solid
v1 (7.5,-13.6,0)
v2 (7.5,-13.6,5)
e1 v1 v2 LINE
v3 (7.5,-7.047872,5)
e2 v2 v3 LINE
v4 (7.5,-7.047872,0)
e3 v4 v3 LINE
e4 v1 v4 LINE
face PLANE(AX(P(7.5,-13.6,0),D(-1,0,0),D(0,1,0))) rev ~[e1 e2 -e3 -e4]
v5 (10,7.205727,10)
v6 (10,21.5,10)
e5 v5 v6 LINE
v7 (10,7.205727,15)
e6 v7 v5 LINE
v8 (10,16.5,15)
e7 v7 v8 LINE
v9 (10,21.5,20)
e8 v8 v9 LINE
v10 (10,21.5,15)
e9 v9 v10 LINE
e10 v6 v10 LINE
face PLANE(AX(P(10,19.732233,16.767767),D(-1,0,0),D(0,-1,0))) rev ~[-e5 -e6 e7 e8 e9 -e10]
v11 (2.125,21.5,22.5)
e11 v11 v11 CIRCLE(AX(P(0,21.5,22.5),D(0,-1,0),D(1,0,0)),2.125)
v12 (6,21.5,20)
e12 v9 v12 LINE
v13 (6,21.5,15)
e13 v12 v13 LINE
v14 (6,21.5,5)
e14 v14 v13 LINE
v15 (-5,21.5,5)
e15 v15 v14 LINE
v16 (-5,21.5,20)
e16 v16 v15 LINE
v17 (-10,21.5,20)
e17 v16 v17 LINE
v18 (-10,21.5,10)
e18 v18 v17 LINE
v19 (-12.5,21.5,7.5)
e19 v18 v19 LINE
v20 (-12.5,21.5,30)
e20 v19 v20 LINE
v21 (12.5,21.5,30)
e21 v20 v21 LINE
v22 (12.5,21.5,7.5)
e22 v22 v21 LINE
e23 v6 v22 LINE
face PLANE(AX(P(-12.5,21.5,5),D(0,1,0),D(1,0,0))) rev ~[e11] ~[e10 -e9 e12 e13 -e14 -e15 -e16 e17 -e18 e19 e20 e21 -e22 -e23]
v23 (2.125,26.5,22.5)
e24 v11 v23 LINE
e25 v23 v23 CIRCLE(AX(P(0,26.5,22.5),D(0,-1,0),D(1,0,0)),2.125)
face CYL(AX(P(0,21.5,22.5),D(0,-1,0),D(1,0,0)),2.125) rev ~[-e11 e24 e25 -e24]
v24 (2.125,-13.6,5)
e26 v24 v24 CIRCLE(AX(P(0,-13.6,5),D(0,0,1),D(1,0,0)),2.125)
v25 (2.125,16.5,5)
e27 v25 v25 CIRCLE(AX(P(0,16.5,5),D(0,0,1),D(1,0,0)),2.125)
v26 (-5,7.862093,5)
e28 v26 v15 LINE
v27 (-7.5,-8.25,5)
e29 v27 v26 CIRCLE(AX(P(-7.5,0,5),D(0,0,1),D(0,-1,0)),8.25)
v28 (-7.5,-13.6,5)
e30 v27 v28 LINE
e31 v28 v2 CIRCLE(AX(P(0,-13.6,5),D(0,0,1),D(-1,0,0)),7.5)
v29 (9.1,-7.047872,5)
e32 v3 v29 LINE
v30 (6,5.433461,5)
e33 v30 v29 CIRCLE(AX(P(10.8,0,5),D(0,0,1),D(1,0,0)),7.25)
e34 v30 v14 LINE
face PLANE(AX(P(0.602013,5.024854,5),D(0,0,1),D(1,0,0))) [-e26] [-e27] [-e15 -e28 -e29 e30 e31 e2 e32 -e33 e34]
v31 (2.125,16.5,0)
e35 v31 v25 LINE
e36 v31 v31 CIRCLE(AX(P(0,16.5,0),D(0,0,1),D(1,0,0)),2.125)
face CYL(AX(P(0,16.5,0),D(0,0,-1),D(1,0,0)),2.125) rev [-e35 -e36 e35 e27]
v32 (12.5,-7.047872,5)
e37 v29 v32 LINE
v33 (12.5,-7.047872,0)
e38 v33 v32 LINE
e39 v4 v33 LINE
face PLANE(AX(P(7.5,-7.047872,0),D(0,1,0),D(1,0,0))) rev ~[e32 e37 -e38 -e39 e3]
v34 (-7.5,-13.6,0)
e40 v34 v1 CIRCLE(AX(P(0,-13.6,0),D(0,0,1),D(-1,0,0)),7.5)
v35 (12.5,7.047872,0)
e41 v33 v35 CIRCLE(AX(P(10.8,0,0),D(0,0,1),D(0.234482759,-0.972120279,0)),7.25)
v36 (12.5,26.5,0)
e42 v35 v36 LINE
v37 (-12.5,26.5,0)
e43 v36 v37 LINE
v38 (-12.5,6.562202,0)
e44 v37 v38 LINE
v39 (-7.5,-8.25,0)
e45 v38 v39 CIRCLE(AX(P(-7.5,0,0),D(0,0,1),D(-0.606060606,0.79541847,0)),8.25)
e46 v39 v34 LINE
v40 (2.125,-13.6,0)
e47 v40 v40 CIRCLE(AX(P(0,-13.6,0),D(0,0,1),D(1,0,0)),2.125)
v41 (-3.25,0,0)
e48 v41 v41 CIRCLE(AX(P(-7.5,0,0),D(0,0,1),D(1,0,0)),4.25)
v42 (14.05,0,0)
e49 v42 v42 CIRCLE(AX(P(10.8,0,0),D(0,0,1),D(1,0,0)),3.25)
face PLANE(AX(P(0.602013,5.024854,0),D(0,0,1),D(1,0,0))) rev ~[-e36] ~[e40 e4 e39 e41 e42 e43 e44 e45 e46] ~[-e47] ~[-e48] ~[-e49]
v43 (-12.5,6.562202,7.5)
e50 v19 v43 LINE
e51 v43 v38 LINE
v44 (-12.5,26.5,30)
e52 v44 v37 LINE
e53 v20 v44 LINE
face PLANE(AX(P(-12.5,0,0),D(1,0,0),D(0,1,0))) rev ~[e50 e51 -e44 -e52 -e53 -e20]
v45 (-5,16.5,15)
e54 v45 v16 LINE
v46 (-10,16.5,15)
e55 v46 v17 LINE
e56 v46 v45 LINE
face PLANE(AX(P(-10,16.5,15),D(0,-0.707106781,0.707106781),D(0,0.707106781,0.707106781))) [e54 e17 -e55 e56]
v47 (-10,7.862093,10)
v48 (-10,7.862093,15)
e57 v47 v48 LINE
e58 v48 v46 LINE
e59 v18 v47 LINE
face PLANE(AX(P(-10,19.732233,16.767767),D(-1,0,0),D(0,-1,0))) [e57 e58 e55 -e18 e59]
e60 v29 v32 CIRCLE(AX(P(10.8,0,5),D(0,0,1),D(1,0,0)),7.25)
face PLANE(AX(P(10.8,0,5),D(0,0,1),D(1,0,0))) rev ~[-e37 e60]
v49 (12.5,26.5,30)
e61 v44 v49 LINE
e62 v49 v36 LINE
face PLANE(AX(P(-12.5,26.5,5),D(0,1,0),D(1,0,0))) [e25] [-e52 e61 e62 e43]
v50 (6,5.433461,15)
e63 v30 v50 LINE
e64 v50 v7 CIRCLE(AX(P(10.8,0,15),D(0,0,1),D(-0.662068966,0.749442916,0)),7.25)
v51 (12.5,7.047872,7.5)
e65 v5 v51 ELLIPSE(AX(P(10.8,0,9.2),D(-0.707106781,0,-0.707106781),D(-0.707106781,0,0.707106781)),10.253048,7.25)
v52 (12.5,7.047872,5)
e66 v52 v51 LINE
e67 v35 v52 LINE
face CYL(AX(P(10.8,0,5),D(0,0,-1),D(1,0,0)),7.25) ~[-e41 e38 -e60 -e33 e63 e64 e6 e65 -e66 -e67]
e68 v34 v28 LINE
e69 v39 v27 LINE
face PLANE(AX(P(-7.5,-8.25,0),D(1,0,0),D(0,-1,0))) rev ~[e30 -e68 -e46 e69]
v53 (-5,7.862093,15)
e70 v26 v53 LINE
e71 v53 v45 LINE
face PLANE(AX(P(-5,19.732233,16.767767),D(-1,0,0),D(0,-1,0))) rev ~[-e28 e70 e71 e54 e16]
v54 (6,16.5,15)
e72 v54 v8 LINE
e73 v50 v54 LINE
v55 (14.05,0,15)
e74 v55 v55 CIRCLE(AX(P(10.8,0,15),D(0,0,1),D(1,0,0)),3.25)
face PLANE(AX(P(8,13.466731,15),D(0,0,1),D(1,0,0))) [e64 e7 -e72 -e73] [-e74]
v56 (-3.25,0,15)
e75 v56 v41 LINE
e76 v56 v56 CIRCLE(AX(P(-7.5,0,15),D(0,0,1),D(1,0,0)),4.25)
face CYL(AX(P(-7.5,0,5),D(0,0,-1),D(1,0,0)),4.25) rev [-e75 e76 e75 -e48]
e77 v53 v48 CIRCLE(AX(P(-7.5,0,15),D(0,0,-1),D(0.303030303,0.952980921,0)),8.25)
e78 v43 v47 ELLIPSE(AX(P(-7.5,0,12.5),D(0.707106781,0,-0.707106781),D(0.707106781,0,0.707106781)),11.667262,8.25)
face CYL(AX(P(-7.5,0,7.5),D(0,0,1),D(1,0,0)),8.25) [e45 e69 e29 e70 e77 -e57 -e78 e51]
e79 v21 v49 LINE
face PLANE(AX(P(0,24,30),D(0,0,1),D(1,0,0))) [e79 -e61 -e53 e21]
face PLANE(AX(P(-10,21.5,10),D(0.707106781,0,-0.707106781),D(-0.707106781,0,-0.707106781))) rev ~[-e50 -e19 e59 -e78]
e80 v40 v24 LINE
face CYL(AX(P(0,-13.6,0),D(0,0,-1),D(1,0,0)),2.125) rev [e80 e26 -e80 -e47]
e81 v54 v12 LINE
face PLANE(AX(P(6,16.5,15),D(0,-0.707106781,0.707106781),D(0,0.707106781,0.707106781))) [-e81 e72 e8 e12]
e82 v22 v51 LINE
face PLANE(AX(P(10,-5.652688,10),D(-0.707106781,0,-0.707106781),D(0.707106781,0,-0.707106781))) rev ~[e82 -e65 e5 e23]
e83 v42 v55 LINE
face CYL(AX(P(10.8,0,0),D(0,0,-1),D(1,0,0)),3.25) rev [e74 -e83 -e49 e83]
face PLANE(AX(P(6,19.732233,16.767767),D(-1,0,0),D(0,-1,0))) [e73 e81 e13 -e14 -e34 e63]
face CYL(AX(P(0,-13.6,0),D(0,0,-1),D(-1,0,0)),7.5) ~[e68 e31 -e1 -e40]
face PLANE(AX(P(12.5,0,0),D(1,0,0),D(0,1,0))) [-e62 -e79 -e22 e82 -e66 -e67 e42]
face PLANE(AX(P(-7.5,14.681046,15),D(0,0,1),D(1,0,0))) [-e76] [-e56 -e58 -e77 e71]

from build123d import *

# Parameters (mm, degrees)
F0_R          = 2.125
F0_R_2        = 4.25
F0_R_3        = 3.25
F1_DEPTH      = 5
F2_W          = 25
F2_H          = 5
F3_DEPTH      = 25
F4_R          = 8.25
F4_R_2        = 4.25
F4_R_3        = 7.25
F4_R_4        = 3.25
F5_DEPTH      = 10
F6_R          = 2.125
F7_DEPTH      = 5.001
F8_W          = 5
F8_H          = 13.6379074032
F8_W_2        = 4
F8_H_2        = 16.0665388563
F9_DEPTH      = 10
F10_T1_DEPTH  = 5
F10_T3_DEPTH  = 4
F10_T8_DEPTH  = 17.8584149398
F10_T13_DEPTH = 16.8584149398
F10_T18_DEPTH = 26.4963223431
F10_S19_R     = 8.25
F10_T20_DEPTH = 15
F10_T25_DEPTH = 26.4963223431
F10_S26_R     = 8.25
F10_T27_DEPTH = 15
F10_T32_DEPTH = 27.1526880508
F10_S34_R     = 7.25
F10_T35_DEPTH = 16


# Not quite as in the source:
# - a fillet or chamfer that OpenCascade refuses, or shapes differently, is made with other operations: its cross-section is extruded or revolved along the edge and cut away or added


with BuildPart() as f1:
    # F0 (on Top) → F1 (new body)
    with BuildSketch(Plane.XY):
        with BuildLine():
            Line((12.5, 26.5), (0, 26.5))
            Line((0, 26.5), (-12.5, 26.5))
            Line((-12.5, 26.5), (-12.5, 6.5622023742))
            ThreePointArc((-12.5, 6.5622023742), (-15.3166703137, -2.6385915194), (-7.5, -8.25))
            Line((-7.5, -8.25), (-7.5, -13.6))
            ThreePointArc((-7.5, -13.6), (-5.3033008589, -18.9033008589), (0, -21.1))
            ThreePointArc((0, -21.1), (5.3033008589, -18.9033008589), (7.5, -13.6))
            Line((7.5, -13.6), (7.5, -7.0478720193))
            Line((7.5, -7.0478720193), (12.5, -7.0478720193))
            ThreePointArc((12.5, -7.0478720193), (18.05, 0), (12.5, 7.0478720193))
            Line((12.5, 7.0478720193), (12.5, 26.5))
        make_face()
        with Locations((0, -13.6)):
            Circle(F0_R, mode=Mode.SUBTRACT)
        with Locations((-7.5, 0)):
            Circle(F0_R_2, mode=Mode.SUBTRACT)
        with Locations((10.8, 0)):
            Circle(F0_R_3, mode=Mode.SUBTRACT)
        with Locations((0, 16.5)):
            Circle(F0_R, mode=Mode.SUBTRACT)
    extrude(amount=F1_DEPTH)

    # F2 (on face) → F3 (join)
    with BuildSketch(Plane.XY.offset(5)):
        with Locations((0, 24)):
            Rectangle(F2_W, F2_H)
    extrude(amount=F3_DEPTH)

    # F4 (on face) → F5 (join)
    with BuildSketch(Plane.XY.offset(5)):
        with Locations((-7.5, 0)):
            Circle(F4_R)
        with Locations((-7.5, 0)):
            Circle(F4_R_2, mode=Mode.SUBTRACT)
        with Locations((10.8, 0)):
            Circle(F4_R_3)
        with Locations((10.8, 0)):
            Circle(F4_R_4, mode=Mode.SUBTRACT)
    extrude(amount=F5_DEPTH)

    # F6 (on face) → F7 (cut, through all)
    with BuildSketch(Plane.XZ.offset(-21.5)):
        with Locations((0, 22.5)):
            Circle(F6_R)
    extrude(amount=-F7_DEPTH, mode=Mode.SUBTRACT)

    # F8 (on face) → F9 (join)
    with BuildSketch(Plane.XY.offset(5)):
        with Locations((-7.5, 14.6810462984)):
            Rectangle(F8_W, F8_H)
        with Locations((8, 13.4667305718)):
            Rectangle(F8_W_2, F8_H_2)
    extrude(amount=F9_DEPTH)

    # F10: chamfer of 5 on 4 edges, made by hand

    # F10_s2 → F10_t1 (join)
    with BuildSketch(Plane.YZ.offset(-10)):
        Polygon((16.5, 15), (21.5, 20), (21.5, 15), align=None)
    extrude(amount=F10_T1_DEPTH)

    # F10_s4 → F10_t3 (join)
    with BuildSketch(Plane.YZ.offset(6)):
        Polygon((16.5, 15), (21.5, 20), (21.5, 15), align=None)
    extrude(amount=F10_T3_DEPTH)


with BuildPart() as f10_tool6:
    # F10_s7 → F10_t8 (new body)
    with BuildSketch(Plane.YZ.offset(7.8584149398)):
        Polygon((16.5, 15), (21.5, 20), (21.5, 15), align=None)
    extrude(amount=-F10_T8_DEPTH)

    split(bisect_by=Plane.YZ.offset(6), keep=Keep.TOP)


with BuildPart() as f1_1:
    add(f1.part)

    # F10_t5: union F10_tool6
    add(f10_tool6.part)


with BuildPart() as f10_tool11:
    # F10_s12 → F10_t13 (new body)
    with BuildSketch(Plane.YZ.offset(10)):
        Polygon((16.5, 15), (21.5, 20), (21.5, 15), align=None)
    extrude(amount=-F10_T13_DEPTH)

    split(bisect_by=Plane.YZ.offset(-5), keep=Keep.BOTTOM)


with BuildPart() as f1_2:
    add(f1_1.part)

    # F10_t10: union F10_tool11
    add(f10_tool11.part)


with BuildPart() as f10_tool16:
    # F10_s17 → F10_t18 (new body)
    with BuildSketch(Plane.XZ.offset(-21.5)):
        Polygon((-10, 10), (-15, 5), (-10, 5), align=None)
    extrude(amount=F10_T18_DEPTH)

    # F10_s19 → F10_t20 (cut, symmetric)
    with BuildSketch(Plane.XY.offset(7.5)):
        with Locations((-7.5, 0)):
            Circle(F10_S19_R)
    extrude(amount=F10_T20_DEPTH, both=True, mode=Mode.SUBTRACT)

    split(bisect_by=Plane.YZ.offset(-12.5), keep=Keep.TOP)


with BuildPart() as f1_3:
    add(f1_2.part)

    # F10_t15: union F10_tool16
    add(f10_tool16.part)


with BuildPart() as f10_tool23:
    # F10_s24 → F10_t25 (new body)
    with BuildSketch(Plane.XZ.offset(-21.5)):
        Polygon((-10, 10), (-15, 5), (-10, 5), align=None)
    extrude(amount=F10_T25_DEPTH)

    # F10_s26 → F10_t27 (intersect, symmetric)
    with BuildSketch(Plane.XY.offset(7.5)):
        with Locations((-7.5, 0)):
            Circle(F10_S26_R)
    extrude(amount=F10_T27_DEPTH, both=True, mode=Mode.INTERSECT)

    split(bisect_by=Plane.YZ.offset(-12.5), keep=Keep.BOTTOM)


with BuildPart() as f1_4:
    add(f1_3.part)

    # F10_t22: union F10_tool23
    add(f10_tool23.part)


with BuildPart() as f10_tool30:
    # F10_s31 → F10_t32 (new body)
    with BuildSketch(Plane.XZ.offset(5.6526880508)):
        Polygon((10, 10), (15, 5), (10, 5), align=None)
    extrude(amount=-F10_T32_DEPTH)

    split(bisect_by=Plane.YZ.offset(12.5), keep=Keep.BOTTOM)

    # F10_s34 → F10_t35 (cut, symmetric)
    with BuildSketch(Plane.XY.offset(7.5)):
        with Locations((10.8, 0)):
            Circle(F10_S34_R)
    extrude(amount=F10_T35_DEPTH, both=True, mode=Mode.SUBTRACT)


with BuildPart() as f1_5:
    add(f1_4.part)

    # F10_t29: union F10_tool30
    add(f10_tool30.part)


solid = f1_5.part
